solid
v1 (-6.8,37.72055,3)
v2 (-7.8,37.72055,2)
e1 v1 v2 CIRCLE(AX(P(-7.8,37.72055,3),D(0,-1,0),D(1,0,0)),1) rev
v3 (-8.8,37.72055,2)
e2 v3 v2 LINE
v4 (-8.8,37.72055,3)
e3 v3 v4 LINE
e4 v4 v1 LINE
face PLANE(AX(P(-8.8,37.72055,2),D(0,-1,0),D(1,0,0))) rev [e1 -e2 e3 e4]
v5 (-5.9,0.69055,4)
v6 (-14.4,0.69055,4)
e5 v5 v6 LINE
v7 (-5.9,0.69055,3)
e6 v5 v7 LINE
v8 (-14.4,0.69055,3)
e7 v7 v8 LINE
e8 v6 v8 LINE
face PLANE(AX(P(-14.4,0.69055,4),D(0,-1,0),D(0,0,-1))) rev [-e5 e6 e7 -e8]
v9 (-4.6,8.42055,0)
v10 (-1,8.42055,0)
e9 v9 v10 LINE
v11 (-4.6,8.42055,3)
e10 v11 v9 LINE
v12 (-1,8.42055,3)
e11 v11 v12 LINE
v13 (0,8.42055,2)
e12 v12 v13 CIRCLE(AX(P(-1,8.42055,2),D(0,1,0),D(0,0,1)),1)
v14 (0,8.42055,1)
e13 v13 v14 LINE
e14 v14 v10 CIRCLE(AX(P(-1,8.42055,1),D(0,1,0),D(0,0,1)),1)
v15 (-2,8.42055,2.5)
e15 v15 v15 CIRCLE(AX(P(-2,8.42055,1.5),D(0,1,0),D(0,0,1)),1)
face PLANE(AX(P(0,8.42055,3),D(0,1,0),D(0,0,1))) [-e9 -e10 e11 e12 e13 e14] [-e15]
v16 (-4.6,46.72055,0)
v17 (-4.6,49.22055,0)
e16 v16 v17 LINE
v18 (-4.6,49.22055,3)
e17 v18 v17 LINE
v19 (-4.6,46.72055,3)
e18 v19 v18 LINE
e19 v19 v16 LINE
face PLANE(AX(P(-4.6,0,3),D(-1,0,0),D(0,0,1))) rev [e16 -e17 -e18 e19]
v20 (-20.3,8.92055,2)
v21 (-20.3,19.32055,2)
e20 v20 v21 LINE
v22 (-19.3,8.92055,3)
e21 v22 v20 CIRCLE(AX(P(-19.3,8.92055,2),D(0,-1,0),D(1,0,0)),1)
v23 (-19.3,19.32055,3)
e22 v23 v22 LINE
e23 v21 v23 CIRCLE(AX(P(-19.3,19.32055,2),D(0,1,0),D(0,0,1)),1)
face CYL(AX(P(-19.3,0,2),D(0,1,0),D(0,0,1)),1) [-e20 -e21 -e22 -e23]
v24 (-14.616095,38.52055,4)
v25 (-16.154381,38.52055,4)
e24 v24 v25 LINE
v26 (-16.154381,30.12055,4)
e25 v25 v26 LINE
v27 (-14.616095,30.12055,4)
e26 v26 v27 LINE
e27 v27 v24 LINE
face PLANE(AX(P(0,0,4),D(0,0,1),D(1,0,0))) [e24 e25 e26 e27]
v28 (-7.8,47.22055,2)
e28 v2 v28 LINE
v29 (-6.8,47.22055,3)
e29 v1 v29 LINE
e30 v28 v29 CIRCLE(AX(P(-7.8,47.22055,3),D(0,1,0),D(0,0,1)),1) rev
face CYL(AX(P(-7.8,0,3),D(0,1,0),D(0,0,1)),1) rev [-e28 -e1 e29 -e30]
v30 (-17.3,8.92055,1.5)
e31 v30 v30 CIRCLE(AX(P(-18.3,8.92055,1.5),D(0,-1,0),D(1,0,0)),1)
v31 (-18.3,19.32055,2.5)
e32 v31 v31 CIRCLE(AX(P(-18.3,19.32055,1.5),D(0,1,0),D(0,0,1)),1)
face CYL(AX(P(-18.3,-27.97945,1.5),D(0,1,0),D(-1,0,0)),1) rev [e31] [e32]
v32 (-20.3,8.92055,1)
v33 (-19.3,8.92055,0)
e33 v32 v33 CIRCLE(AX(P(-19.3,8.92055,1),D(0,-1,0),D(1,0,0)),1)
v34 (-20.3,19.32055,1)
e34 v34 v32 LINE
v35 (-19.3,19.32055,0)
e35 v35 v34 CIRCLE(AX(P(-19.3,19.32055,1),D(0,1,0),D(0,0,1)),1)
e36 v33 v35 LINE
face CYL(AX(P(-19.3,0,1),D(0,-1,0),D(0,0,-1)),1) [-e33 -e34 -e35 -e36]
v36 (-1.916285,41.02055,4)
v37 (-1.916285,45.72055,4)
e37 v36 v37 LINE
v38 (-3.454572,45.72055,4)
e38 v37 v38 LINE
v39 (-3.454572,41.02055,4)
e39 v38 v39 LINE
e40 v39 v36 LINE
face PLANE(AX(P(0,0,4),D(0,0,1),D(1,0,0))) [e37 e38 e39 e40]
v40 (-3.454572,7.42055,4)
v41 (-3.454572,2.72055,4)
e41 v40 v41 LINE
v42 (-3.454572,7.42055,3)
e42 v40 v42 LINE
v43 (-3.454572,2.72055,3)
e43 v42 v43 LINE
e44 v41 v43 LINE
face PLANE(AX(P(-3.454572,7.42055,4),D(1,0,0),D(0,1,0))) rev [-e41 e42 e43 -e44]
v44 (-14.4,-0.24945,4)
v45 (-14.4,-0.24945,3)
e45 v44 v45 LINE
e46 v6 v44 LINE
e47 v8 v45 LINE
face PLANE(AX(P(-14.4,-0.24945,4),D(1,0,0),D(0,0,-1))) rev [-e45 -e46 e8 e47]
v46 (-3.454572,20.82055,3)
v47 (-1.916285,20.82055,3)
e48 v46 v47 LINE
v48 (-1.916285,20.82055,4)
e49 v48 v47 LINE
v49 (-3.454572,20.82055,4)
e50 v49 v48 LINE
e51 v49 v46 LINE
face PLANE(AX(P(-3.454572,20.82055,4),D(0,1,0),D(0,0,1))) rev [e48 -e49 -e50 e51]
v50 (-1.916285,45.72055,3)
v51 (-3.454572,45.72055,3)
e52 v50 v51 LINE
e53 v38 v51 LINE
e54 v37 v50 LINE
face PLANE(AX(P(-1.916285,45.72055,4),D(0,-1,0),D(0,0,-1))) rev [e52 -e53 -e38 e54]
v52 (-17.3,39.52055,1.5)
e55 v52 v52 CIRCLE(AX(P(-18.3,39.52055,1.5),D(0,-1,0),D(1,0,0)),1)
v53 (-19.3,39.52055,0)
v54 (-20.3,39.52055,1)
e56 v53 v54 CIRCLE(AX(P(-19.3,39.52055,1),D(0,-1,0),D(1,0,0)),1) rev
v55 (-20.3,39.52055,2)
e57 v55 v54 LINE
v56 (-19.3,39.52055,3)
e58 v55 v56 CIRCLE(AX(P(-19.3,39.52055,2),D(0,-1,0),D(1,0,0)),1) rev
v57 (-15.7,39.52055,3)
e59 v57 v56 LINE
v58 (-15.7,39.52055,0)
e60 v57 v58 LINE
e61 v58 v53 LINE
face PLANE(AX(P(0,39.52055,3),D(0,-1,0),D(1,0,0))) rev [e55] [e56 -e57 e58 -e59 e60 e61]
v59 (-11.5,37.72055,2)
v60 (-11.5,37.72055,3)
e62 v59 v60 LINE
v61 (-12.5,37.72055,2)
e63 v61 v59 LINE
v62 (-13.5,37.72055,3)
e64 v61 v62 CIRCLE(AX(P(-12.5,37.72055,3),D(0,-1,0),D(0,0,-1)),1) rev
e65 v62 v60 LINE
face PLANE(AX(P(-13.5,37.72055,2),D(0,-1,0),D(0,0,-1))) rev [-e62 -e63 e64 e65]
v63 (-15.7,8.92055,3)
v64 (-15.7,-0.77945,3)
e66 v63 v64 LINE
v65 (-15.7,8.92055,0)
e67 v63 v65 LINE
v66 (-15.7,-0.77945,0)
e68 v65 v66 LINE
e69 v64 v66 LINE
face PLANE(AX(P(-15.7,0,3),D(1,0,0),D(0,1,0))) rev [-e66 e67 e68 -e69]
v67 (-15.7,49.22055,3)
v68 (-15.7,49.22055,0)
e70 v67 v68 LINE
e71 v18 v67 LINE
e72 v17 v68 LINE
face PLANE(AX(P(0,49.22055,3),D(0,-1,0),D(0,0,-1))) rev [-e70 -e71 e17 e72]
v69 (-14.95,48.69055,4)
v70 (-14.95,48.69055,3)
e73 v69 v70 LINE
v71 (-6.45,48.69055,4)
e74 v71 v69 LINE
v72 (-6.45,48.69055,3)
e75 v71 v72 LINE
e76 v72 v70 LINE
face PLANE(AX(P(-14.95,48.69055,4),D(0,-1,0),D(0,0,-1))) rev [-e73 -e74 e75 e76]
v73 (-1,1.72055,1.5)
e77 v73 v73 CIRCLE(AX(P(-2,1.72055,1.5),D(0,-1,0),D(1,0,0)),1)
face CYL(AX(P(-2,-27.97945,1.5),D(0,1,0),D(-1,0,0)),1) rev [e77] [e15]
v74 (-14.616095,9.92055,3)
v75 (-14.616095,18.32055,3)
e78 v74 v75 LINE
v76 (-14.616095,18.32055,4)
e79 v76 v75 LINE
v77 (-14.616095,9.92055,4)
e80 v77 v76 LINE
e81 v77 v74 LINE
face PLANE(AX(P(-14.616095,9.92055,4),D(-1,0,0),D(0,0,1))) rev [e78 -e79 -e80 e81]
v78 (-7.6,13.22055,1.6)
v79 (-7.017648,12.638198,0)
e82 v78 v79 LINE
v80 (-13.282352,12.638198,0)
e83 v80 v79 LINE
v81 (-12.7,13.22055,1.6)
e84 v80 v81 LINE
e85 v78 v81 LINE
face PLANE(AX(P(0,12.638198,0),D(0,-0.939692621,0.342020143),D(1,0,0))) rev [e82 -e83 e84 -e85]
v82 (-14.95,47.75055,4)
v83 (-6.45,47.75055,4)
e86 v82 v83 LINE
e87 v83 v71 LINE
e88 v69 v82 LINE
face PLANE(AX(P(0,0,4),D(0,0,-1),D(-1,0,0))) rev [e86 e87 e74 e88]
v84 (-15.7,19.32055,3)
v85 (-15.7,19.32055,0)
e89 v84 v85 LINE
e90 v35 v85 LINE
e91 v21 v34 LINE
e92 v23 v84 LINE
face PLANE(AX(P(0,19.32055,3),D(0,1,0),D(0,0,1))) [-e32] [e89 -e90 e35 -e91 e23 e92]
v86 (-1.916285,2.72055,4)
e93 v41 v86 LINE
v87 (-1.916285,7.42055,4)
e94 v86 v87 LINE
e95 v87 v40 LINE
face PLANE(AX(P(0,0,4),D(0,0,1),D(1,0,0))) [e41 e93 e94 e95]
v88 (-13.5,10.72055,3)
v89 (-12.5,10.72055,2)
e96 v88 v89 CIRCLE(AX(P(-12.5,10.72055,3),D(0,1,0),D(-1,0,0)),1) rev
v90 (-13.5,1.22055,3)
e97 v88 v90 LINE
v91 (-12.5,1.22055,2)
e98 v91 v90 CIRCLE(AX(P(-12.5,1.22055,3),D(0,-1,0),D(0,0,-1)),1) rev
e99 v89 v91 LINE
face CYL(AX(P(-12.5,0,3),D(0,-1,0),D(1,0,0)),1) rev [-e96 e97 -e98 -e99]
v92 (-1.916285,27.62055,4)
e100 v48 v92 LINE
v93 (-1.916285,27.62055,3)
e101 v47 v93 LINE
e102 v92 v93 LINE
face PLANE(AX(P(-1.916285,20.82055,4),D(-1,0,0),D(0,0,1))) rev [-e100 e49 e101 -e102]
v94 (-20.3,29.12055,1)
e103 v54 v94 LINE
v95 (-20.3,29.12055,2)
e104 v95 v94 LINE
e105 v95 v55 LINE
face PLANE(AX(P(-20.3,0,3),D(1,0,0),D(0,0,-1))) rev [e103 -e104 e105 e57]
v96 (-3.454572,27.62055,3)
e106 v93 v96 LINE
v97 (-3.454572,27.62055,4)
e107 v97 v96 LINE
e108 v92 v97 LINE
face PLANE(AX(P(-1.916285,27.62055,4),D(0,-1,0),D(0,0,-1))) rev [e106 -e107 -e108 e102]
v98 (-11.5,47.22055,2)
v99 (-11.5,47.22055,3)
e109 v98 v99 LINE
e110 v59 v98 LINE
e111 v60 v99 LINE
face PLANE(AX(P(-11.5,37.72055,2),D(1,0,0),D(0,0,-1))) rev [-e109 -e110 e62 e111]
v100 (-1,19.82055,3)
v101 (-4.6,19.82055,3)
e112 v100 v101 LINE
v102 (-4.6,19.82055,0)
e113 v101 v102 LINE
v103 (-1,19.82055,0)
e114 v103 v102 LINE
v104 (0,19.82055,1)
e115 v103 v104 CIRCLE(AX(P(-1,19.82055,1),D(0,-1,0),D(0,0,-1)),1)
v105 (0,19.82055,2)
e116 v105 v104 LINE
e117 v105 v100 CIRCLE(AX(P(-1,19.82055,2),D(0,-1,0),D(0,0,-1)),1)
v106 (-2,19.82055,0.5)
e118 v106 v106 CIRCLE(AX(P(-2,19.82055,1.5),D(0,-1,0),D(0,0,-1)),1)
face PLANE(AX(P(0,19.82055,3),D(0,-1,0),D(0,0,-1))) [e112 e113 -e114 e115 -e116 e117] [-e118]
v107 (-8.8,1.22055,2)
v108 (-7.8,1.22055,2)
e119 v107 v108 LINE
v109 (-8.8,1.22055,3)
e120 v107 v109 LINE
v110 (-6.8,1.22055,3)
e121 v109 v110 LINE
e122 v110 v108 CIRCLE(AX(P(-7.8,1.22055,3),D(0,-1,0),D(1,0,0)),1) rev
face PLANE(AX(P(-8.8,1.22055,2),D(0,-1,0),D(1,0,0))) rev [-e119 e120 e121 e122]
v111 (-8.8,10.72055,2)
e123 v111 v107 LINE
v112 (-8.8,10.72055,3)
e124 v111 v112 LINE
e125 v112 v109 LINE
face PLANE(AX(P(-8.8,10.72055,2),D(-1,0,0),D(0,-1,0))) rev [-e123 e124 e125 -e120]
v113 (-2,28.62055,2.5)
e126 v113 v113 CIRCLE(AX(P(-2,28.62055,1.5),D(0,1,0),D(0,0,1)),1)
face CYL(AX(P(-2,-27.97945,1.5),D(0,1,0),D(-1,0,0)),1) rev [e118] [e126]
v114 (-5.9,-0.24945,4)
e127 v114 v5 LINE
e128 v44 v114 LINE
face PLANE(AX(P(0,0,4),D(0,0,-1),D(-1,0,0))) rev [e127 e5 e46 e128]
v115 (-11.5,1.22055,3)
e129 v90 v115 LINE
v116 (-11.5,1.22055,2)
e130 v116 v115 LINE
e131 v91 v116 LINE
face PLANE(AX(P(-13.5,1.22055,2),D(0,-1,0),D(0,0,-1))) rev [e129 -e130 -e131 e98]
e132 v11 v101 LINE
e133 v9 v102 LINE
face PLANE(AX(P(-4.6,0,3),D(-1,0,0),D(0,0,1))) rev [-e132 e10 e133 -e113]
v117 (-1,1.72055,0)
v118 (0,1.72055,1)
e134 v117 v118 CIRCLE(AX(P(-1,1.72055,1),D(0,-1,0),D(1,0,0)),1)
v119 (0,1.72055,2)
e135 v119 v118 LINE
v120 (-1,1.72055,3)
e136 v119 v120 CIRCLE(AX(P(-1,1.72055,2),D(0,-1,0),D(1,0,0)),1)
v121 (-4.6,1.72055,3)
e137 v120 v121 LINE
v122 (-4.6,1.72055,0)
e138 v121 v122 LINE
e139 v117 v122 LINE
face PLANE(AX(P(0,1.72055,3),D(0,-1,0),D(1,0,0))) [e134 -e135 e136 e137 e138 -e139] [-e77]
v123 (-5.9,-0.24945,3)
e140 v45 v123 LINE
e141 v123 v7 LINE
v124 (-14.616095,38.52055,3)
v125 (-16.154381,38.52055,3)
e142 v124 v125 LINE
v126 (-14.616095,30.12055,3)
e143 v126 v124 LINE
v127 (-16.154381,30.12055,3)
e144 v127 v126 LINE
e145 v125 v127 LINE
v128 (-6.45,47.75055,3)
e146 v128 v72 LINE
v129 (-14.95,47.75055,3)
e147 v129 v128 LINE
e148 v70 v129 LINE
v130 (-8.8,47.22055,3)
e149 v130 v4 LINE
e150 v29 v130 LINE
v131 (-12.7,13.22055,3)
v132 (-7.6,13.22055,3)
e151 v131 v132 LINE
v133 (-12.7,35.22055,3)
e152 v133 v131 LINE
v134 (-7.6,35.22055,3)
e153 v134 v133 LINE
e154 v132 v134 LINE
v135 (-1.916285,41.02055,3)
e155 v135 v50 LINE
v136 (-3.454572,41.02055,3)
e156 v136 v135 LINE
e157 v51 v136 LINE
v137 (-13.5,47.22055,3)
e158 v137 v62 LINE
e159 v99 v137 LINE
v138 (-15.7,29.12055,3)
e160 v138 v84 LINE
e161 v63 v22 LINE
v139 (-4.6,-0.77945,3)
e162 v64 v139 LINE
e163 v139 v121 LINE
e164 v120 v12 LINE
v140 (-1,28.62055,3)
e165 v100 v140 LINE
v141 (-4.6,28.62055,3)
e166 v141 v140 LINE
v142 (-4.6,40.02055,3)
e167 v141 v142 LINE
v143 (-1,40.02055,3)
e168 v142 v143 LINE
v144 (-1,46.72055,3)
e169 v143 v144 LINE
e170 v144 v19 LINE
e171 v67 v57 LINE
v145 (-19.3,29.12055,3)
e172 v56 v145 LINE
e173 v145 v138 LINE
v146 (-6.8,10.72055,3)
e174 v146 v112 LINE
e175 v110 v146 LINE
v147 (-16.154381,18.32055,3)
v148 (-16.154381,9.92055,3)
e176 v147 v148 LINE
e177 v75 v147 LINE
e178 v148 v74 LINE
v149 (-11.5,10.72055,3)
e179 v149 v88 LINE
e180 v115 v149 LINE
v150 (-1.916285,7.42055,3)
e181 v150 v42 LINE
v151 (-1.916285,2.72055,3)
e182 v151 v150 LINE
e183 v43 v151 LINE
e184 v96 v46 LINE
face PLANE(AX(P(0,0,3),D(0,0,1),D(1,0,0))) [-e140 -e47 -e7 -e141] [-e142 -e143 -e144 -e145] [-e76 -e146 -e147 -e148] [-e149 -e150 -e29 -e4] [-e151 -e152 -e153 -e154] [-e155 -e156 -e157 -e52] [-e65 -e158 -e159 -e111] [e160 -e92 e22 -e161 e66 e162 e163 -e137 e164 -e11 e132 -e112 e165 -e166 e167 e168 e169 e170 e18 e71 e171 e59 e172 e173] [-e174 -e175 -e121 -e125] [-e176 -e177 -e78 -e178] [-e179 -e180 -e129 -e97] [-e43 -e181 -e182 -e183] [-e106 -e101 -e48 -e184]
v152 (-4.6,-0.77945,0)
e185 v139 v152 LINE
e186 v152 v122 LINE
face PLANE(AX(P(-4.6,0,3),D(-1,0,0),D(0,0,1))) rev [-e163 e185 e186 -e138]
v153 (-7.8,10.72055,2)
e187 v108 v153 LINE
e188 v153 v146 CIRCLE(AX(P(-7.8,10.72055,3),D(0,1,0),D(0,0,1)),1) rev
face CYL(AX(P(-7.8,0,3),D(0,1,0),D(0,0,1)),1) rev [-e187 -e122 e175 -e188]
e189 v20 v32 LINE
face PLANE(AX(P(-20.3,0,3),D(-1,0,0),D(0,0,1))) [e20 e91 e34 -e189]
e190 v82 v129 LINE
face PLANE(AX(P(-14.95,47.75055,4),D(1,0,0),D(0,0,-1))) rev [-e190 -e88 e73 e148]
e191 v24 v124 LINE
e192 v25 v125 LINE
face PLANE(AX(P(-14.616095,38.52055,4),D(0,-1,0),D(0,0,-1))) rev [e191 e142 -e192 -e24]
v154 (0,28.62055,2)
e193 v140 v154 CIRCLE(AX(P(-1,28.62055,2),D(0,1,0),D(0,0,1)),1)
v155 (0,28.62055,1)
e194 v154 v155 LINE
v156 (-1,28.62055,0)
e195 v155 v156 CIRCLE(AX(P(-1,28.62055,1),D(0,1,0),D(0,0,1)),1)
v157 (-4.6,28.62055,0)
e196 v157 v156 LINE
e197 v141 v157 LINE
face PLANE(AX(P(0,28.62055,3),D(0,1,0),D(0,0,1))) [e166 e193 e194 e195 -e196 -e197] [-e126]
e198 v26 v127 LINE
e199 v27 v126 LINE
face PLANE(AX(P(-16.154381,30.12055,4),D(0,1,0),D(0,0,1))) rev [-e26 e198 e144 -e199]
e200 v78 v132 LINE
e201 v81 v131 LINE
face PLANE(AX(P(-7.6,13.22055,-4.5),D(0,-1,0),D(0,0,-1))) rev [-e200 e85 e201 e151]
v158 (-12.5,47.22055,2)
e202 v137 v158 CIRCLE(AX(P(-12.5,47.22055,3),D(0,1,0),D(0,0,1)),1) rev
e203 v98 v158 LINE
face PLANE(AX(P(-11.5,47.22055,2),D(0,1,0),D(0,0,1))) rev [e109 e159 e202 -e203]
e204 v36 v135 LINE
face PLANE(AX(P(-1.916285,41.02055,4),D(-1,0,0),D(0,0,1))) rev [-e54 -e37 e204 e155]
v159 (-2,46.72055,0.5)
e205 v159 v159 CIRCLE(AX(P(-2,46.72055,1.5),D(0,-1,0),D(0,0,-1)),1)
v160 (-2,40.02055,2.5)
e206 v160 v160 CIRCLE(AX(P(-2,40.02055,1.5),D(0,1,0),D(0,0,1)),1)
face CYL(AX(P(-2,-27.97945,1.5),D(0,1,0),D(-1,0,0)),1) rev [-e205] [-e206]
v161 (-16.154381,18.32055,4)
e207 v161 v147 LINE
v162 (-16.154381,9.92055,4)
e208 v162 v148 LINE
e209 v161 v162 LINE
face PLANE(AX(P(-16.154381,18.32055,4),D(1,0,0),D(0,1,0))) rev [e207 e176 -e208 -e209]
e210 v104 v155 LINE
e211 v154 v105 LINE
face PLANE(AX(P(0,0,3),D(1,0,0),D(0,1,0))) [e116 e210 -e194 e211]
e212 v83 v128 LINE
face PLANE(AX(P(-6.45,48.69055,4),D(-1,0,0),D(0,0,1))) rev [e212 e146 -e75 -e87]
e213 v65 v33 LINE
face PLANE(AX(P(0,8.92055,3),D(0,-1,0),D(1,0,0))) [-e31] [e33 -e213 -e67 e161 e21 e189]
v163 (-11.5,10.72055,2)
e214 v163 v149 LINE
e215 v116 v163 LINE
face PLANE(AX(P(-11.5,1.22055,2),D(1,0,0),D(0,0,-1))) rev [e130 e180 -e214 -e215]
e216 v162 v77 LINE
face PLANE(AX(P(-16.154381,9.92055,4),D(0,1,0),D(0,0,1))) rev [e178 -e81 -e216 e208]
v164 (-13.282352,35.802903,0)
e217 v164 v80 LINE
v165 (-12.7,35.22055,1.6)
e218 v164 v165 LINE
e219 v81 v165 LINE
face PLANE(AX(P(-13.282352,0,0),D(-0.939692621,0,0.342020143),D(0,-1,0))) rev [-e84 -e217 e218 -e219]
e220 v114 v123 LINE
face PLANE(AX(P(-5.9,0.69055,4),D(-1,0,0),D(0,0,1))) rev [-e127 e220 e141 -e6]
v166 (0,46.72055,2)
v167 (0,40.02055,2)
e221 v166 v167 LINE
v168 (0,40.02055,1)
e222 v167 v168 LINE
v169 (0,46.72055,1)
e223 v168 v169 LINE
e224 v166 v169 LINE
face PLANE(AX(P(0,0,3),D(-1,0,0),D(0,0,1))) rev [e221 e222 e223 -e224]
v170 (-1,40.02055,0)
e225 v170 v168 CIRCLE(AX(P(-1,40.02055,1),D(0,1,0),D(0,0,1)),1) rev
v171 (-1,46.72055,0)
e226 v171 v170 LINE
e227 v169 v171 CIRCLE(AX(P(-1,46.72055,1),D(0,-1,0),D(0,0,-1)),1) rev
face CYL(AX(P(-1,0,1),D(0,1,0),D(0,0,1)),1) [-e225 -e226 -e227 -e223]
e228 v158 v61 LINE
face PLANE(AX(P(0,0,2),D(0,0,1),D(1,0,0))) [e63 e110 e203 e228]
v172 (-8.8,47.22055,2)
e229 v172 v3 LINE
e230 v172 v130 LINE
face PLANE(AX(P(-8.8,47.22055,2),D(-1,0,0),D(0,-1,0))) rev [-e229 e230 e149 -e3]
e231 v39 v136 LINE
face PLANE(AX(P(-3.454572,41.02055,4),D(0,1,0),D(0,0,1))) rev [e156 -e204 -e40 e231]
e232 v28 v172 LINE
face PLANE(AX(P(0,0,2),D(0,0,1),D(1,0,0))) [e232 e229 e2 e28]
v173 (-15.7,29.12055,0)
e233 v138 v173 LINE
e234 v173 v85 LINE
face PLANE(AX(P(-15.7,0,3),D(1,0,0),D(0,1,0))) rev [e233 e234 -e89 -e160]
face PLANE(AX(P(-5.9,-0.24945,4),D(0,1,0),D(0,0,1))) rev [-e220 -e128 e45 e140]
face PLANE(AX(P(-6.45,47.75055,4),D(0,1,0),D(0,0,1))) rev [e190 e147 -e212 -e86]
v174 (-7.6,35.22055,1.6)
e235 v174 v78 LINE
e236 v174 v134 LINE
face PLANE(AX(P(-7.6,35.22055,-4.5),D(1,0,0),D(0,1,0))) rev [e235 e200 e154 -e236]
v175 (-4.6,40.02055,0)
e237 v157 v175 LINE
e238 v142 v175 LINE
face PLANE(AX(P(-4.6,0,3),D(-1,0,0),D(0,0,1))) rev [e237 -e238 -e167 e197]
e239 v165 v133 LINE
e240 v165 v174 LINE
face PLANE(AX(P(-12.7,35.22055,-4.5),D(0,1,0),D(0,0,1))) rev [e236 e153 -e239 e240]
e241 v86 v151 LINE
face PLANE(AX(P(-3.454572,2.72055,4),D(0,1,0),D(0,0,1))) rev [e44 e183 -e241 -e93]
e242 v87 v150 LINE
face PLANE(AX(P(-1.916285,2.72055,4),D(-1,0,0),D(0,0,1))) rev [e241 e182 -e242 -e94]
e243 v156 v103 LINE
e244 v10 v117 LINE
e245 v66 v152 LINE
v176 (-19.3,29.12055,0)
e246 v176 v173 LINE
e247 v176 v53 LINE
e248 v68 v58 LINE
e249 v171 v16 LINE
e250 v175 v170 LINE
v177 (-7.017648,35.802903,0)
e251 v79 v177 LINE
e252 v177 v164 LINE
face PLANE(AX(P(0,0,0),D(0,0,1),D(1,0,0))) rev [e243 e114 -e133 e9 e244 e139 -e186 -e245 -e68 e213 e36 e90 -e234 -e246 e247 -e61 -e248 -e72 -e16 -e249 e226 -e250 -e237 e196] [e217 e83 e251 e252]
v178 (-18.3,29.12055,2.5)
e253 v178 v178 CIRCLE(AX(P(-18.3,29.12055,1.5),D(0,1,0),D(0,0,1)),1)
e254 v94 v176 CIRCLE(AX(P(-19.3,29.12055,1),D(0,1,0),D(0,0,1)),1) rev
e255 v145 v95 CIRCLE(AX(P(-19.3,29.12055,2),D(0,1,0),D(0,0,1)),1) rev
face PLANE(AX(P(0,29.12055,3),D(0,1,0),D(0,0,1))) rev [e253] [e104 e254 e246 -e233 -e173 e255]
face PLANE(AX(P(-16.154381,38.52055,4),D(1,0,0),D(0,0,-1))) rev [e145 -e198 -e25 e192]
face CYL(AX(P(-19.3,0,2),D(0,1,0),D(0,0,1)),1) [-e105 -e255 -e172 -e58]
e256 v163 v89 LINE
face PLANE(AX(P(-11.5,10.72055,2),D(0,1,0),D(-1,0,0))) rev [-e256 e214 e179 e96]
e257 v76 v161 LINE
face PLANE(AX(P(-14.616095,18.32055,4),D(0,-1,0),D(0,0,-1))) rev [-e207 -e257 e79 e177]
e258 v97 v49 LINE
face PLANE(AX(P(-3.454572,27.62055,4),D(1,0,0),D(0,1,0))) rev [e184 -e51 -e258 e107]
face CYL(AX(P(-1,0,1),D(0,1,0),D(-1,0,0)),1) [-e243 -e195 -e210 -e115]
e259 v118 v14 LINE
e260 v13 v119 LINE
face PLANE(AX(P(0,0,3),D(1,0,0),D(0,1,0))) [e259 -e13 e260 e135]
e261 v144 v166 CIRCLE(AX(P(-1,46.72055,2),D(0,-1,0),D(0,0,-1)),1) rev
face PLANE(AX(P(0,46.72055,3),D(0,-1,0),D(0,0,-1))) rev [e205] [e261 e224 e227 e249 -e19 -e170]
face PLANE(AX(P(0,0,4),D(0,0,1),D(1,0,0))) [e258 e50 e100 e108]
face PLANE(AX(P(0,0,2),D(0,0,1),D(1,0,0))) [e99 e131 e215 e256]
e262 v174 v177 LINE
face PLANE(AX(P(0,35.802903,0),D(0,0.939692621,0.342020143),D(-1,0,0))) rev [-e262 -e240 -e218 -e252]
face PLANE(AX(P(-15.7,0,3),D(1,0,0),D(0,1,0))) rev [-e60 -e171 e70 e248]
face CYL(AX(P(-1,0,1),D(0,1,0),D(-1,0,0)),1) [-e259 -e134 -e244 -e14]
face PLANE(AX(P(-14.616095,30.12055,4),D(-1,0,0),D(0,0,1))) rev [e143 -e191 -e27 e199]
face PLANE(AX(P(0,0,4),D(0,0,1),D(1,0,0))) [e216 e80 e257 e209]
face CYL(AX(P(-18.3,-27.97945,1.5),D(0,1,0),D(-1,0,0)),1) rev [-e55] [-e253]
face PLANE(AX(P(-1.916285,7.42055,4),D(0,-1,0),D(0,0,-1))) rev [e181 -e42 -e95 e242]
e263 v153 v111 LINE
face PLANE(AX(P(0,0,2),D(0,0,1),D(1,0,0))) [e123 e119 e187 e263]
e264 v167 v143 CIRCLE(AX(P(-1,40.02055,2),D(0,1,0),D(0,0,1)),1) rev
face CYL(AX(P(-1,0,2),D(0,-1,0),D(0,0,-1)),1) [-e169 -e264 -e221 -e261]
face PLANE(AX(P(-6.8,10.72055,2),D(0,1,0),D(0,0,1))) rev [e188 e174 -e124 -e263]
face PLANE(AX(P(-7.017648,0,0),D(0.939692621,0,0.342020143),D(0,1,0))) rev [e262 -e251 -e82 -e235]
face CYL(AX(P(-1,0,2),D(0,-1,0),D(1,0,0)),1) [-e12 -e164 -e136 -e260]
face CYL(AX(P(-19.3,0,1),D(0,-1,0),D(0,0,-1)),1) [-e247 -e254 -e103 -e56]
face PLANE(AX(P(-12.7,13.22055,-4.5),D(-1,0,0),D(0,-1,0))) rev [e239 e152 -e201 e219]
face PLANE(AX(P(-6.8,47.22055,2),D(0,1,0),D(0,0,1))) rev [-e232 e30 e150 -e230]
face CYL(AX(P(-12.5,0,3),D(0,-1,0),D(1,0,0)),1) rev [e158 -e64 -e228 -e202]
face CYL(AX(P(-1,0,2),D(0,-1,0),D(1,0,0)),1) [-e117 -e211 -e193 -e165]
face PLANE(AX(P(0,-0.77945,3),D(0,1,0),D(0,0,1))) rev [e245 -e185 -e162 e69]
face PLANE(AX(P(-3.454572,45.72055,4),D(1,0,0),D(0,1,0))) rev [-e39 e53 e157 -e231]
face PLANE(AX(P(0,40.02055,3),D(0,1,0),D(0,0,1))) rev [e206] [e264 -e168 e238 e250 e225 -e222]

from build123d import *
from OCP.BRepFilletAPI import BRepFilletAPI_MakeChamfer

# Parameters (mm, degrees)
SKIZZE1_W                            = 4.6
SKIZZE1_H                            = 10.4
SKIZZE1_W_2                          = 11.1
SKIZZE1_H_2                          = 50
SKIZZE1_H_3                          = 6.7
SKIZZE1_H_4                          = 8.8
AUFSATZ_LINEAR_AUSTRAGEN1_DEPTH      = 3
SCHNITT_LINEAR_AUSTRAGEN1_DEPTH      = 37.5
SCHNITT_LINEAR_AUSTRAGEN1_DEPTH_BACK = 67.5
SKIZZE2_R                            = 1
SKIZZE3_W                            = 5.1
SKIZZE3_H                            = 22
SCHNITT_LINEAR_AUSTRAGEN2_DEPTH      = 7.5
VERRUNDUNG4_R                        = 1
SKIZZE4_W                            = 2
SKIZZE4_H                            = 9.5
SCHNITT_LINEAR_AUSTRAGEN3_DEPTH      = 1
VERRUNDUNG5_R                        = 1
SKIZZE7_W                            = 8.5
SKIZZE7_H                            = 0.94
SKIZZE7_W_2                          = 1.53828676
SKIZZE7_H_2                          = 8.4
SKIZZE7_H_3                          = 4.7
SKIZZE7_H_4                          = 6.8
AUFSATZ_LINEAR_AUSTRAGEN4_DEPTH      = 1
FASE1_SIZE                           = 1.6
FASE1_SIZE2                          = 0.582352375


with BuildPart() as part:
    # Skizze1 → Aufsatz-Linear austragen1 (new body)
    with BuildSketch(Plane.XY):
        with Locations((-18, 14.120550309)):
            Rectangle(SKIZZE1_W, SKIZZE1_H)
        with Locations((-10.15, 24.220550309)):
            Rectangle(SKIZZE1_W_2, SKIZZE1_H_2)
        with Locations((-18, 34.320550309)):
            Rectangle(SKIZZE1_W, SKIZZE1_H)
        with Locations((-2.3, 43.370550309)):
            Rectangle(SKIZZE1_W, SKIZZE1_H_3)
        with Locations((-2.3, 5.070550309)):
            Rectangle(SKIZZE1_W, SKIZZE1_H_3)
        with Locations((-2.3, 24.220550309)):
            Rectangle(SKIZZE1_W, SKIZZE1_H_4)
    extrude(amount=AUFSATZ_LINEAR_AUSTRAGEN1_DEPTH)

    # Skizze2 → Schnitt-Linear austragen1 (cut, two sides: drawn at the far end of the back side and taken through both)
    with BuildSketch(Plane(origin=(0, 39.520550309, 0), x_dir=(1, 0, 0), z_dir=(0, 1, 0)).offset(-SCHNITT_LINEAR_AUSTRAGEN1_DEPTH_BACK)):
        with Locations(Location((-18.3, -1.5, 0), (0, 0, 270))):
            Circle(SKIZZE2_R)
        with Locations(Location((-2, -1.5, 0), (0, 0, 90))):
            Circle(SKIZZE2_R)
    extrude(amount=SCHNITT_LINEAR_AUSTRAGEN1_DEPTH + SCHNITT_LINEAR_AUSTRAGEN1_DEPTH_BACK, mode=Mode.SUBTRACT)

    # Skizze3 → Schnitt-Linear austragen2 (cut)
    with BuildSketch(Plane.XY.offset(3)):
        with Locations((-10.15, 24.220550309)):
            Rectangle(SKIZZE3_W, SKIZZE3_H)
    extrude(amount=-SCHNITT_LINEAR_AUSTRAGEN2_DEPTH, mode=Mode.SUBTRACT)

    # Verrundung4
    verrundung4_edges = [part.edges().sort_by_distance(p)[0] for p in [
        (-20.3, 14.120550309, 3),
        (-20.3, 34.320550309, 3),
        (-20.3, 34.320550309, 0),
        (0, 43.370550309, 0),
        (0, 24.220550309, 0),
        (0, 5.070550309, 0),
        (-20.3, 14.120550309, 0),
        (0, 5.070550309, 3),
        (0, 24.220550309, 3),
        (0, 43.370550309, 3),
    ]]
    fillet(verrundung4_edges, radius=VERRUNDUNG4_R)

    # Skizze4 → Schnitt-Linear austragen3 (cut)
    with BuildSketch(Plane.XY.offset(3)):
        with Locations((-12.5, 42.470550309)):
            Rectangle(SKIZZE4_W, SKIZZE4_H)
        with Locations((-12.5, 5.970550309)):
            Rectangle(SKIZZE4_W, SKIZZE4_H)
        with Locations((-7.8, 42.470550309)):
            Rectangle(SKIZZE4_W, SKIZZE4_H)
        with Locations((-7.8, 5.970550309)):
            Rectangle(SKIZZE4_W, SKIZZE4_H)
    extrude(amount=-SCHNITT_LINEAR_AUSTRAGEN3_DEPTH, mode=Mode.SUBTRACT)

    # Verrundung5
    verrundung5_edges = [part.edges().sort_by_distance(p)[0] for p in [
        (-6.8, 5.970550309, 2),
        (-13.5, 5.970550309, 2),
        (-13.5, 42.470550309, 2),
        (-6.8, 42.470550309, 2),
    ]]
    fillet(verrundung5_edges, radius=VERRUNDUNG5_R - 0.0001)  # a hair under: the kernel refuses the full size

    # Skizze7 → Aufsatz-Linear austragen4 (add)
    with BuildSketch(Plane.XY.offset(3)):
        with Locations((-10.7, 48.220550309)):
            Rectangle(SKIZZE7_W, SKIZZE7_H)
        with Locations((-10.15, 0.220550309)):
            Rectangle(SKIZZE7_W, SKIZZE7_H)
        with Locations((-15.385238006, 14.120550309)):
            Rectangle(SKIZZE7_W_2, SKIZZE7_H_2)
        with Locations((-2.685428708, 5.070550309)):
            Rectangle(SKIZZE7_W_2, SKIZZE7_H_3)
        with Locations((-2.685428708, 24.220550309)):
            Rectangle(SKIZZE7_W_2, SKIZZE7_H_4)
        with Locations((-15.385238006, 34.320550309)):
            Rectangle(SKIZZE7_W_2, SKIZZE7_H_2)
        with Locations((-2.685428708, 43.370550309)):
            Rectangle(SKIZZE7_W_2, SKIZZE7_H_3)
    extrude(amount=AUFSATZ_LINEAR_AUSTRAGEN4_DEPTH)

    # Fase1: one chamfer whose edges measure the first distance from different faces: ONE call of the kernel's chamfer builder (chamfer() names one face for all edges)
    fase1_edges_1 = [part.edges().sort_by_distance(p)[0] for p in [
        (-10.15, 35.220550309, 0),
    ]]
    fase1_side_1 = [part.faces().sort_by_distance(p)[0] for p in [
        (-10.15, 35.220550309, 1.5),
    ]]
    fase1_edges_2 = [part.edges().sort_by_distance(p)[0] for p in [
        (-12.7, 24.220550309, 0),
    ]]
    fase1_side_2 = [part.faces().sort_by_distance(p)[0] for p in [
        (-12.7, 24.220550309, 1.5),
    ]]
    fase1_edges_3 = [part.edges().sort_by_distance(p)[0] for p in [
        (-10.15, 13.220550309, 0),
    ]]
    fase1_side_3 = [part.faces().sort_by_distance(p)[0] for p in [
        (-10.15, 13.220550309, 1.5),
    ]]
    fase1_edges_4 = [part.edges().sort_by_distance(p)[0] for p in [
        (-7.6, 24.220550309, 0),
    ]]
    fase1_side_4 = [part.faces().sort_by_distance(p)[0] for p in [
        (-7.6, 24.220550309, 1.5),
    ]]
    fase1 = BRepFilletAPI_MakeChamfer(part.part.solid().wrapped)
    for e in fase1_edges_1:
        fase1.Add(FASE1_SIZE, FASE1_SIZE2, e.wrapped, fase1_side_1[0].wrapped)  # the first distance lies on this face
    for e in fase1_edges_2:
        fase1.Add(FASE1_SIZE, FASE1_SIZE2, e.wrapped, fase1_side_2[0].wrapped)  # the first distance lies on this face
    for e in fase1_edges_3:
        fase1.Add(FASE1_SIZE, FASE1_SIZE2, e.wrapped, fase1_side_3[0].wrapped)  # the first distance lies on this face
    for e in fase1_edges_4:
        fase1.Add(FASE1_SIZE, FASE1_SIZE2, e.wrapped, fase1_side_4[0].wrapped)  # the first distance lies on this face
    add(Compound.cast(fase1.Shape()), mode=Mode.REPLACE)


solid = part.part
